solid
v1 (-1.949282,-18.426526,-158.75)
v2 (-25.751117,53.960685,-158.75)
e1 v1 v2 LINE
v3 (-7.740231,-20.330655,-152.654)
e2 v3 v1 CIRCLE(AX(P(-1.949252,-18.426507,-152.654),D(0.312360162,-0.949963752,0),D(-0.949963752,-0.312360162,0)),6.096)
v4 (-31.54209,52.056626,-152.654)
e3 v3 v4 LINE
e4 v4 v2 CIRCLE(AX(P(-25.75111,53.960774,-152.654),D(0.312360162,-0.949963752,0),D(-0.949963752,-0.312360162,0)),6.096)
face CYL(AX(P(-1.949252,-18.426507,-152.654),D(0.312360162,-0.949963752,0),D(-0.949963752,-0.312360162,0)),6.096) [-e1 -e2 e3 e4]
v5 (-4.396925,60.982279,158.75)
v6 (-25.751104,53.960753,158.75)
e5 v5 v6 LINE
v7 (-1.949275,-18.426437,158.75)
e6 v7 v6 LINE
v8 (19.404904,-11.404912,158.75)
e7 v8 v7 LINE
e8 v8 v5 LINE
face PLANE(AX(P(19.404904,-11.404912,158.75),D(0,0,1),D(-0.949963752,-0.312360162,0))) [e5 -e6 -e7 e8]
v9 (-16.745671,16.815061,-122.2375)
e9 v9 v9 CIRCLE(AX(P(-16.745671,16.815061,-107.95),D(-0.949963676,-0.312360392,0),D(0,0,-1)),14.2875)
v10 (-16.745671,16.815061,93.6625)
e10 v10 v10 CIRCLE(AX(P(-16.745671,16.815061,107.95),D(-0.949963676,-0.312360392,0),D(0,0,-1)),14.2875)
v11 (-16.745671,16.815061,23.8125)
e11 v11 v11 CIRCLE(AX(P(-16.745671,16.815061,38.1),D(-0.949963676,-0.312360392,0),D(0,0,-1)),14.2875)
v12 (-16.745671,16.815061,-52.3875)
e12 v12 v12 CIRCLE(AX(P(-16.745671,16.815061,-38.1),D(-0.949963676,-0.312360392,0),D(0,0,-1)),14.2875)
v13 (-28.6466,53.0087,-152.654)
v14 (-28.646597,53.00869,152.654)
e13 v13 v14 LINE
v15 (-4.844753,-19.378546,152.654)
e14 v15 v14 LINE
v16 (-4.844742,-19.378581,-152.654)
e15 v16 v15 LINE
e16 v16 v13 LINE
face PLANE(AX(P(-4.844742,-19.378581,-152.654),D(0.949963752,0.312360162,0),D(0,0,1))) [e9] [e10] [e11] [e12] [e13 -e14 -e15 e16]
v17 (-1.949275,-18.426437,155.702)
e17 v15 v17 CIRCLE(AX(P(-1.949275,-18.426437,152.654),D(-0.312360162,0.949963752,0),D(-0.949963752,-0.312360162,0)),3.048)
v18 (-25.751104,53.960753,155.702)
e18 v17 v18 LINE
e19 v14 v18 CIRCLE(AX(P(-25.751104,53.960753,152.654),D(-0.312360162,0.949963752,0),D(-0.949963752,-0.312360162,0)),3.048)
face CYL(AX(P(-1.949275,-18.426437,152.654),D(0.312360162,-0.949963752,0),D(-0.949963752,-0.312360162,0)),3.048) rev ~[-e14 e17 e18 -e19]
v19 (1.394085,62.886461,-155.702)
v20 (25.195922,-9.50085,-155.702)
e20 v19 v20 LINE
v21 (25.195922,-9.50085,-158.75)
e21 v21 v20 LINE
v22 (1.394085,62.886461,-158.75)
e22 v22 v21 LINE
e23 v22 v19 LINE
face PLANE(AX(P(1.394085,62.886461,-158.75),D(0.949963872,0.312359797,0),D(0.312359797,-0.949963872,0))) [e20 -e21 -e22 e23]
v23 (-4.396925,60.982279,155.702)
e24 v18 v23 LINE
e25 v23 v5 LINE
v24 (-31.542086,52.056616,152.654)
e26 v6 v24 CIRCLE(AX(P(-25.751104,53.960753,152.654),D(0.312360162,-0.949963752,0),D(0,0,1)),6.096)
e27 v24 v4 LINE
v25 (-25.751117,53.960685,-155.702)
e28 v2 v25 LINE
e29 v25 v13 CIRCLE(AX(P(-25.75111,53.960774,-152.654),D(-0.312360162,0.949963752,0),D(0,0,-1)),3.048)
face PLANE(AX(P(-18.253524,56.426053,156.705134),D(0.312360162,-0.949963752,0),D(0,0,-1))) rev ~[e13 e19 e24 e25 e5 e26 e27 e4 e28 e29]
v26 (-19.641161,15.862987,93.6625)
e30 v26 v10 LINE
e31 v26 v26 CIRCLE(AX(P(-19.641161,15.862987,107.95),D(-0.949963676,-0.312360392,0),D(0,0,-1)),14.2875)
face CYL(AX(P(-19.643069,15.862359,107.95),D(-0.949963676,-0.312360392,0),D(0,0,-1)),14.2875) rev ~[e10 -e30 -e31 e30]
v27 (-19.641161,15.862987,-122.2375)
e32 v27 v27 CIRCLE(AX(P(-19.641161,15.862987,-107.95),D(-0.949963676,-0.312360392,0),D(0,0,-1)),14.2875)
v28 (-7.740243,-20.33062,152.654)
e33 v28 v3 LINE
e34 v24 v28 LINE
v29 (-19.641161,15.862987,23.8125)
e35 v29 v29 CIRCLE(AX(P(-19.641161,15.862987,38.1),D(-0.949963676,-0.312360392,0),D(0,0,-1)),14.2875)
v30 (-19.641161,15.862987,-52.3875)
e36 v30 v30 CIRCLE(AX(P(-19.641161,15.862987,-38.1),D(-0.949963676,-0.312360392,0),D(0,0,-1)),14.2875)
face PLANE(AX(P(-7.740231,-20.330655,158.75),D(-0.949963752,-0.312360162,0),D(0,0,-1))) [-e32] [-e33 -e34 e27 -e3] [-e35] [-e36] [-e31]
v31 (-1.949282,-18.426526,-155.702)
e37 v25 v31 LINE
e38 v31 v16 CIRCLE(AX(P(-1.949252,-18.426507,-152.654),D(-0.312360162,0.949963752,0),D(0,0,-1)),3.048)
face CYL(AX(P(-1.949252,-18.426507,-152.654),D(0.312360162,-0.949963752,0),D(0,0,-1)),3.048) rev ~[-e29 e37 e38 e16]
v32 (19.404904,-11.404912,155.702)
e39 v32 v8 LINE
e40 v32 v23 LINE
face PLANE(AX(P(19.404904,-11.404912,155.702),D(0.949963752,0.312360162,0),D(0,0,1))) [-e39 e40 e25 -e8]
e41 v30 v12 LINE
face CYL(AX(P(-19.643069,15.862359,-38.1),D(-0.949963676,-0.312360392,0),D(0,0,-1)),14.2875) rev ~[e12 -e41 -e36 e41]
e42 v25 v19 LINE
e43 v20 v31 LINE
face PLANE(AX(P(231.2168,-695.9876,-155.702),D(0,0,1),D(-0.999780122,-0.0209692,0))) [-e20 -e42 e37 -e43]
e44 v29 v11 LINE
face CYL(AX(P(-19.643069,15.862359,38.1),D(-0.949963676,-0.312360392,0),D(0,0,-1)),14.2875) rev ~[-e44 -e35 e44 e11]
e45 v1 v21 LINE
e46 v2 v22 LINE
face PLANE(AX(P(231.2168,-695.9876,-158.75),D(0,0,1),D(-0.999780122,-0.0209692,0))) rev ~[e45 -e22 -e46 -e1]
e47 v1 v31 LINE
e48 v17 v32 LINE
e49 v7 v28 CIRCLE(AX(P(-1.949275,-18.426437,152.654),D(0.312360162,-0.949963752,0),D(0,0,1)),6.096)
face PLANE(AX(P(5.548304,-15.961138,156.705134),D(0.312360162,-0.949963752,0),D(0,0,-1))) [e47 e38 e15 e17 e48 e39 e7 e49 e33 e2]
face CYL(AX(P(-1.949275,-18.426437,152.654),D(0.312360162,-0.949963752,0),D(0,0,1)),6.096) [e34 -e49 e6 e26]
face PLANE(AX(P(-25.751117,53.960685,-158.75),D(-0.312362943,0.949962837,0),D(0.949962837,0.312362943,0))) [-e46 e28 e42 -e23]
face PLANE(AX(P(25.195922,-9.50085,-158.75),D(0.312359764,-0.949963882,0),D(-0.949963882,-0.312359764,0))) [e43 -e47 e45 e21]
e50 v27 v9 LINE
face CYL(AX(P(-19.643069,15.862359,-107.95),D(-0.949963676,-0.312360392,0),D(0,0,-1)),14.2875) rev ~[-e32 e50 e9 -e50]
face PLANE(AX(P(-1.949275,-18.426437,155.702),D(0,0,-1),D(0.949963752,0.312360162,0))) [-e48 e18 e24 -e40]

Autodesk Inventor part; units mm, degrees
ref_plane "YZ Plane" through (0, 0, 0) normal (1, 0, 0) x (0, 1, 0)
ref_plane "XZ Plane" through (0, 0, 0) normal (0, 1, 0) x (-1, 0, 0)
ref_plane "XY Plane" through (0, 0, 0) normal (0, 0, 1) x (1, 0, 0)
ref_plane "Work Plane1" through (231.2168, -695.9876, -158.75) normal (0, 0, 1) x (-0.9997801, -0.0209692, 0)
sketch "Sketch1" plane through (231.2168, -695.9876, -158.75) normal (0, 0, 1) x (-0.9997801, -0.0209692, 0)
  line L0 (191.5805, -690.6559) -> (218.9069, -682.3014)
  line L1 (218.9069, -682.3014) -> (241.1856, -755.1718)
  line L2 (241.1856, -755.1718) -> (213.8592, -763.5264)
  line L3 (213.8592, -763.5264) -> (191.5805, -690.6559)
  arc A0 (211.507, -928.635) -> (222.8439, -923.2276) centre (216.7713, -925.0841) ccw
  line L4 (203.7328, -860.718) -> (222.8439, -923.2276)
  arc A1 (207.9488, -852.7889) -> (203.7328, -860.718) centre (209.8053, -858.8615) ccw
  line L5 (232.2389, -845.3627) -> (207.9488, -852.7889)
  arc A2 (240.168, -849.5787) -> (232.2389, -845.3627) centre (234.0955, -851.4352) ccw
  line L6 (288.8094, -1008.6774) -> (240.168, -849.5787)
  arc A3 (288.8094, -1008.6774) -> (289.6175, -1010.3717) centre (294.8819, -1006.8208) ccw
  line L7 (308.7826, -1038.7851) -> (289.6175, -1010.3717)
  arc A4 (308.7826, -1038.7851) -> (317.5979, -1040.4986) centre (314.047, -1035.2342) ccw
  line L8 (596.6104, -852.3023) -> (317.5979, -1040.4986)
  line L9 (312.5405, -431.1512) -> (596.6104, -852.3023)
  line L10 (95.3316, -577.6604) -> (312.5405, -431.1512)
  arc A5 (95.3316, -577.6604) -> (92.8099, -584.7814) centre (98.8825, -582.9248) ccw
  line L11 (186.4087, -890.9291) -> (92.8099, -584.7814)
  arc A6 (186.4087, -890.9291) -> (187.2168, -892.6234) centre (192.4812, -889.0725) ccw
  line L12 (211.507, -928.635) -> (187.2168, -892.6234)
  line L13 (151.3976, -689.5372) -> (192.5934, -824.2828)
  arc A7 (155.6135, -681.6081) -> (151.3976, -689.5372) centre (157.4701, -687.6806) ccw
  line L14 (179.9037, -674.1818) -> (155.6135, -681.6081)
  arc A8 (187.8328, -678.3978) -> (179.9037, -674.1818) centre (181.7602, -680.2544) ccw
  line L15 (229.0286, -813.1435) -> (187.8328, -678.3978)
  arc A9 (224.8127, -821.0726) -> (229.0286, -813.1435) centre (222.9561, -815) ccw
  line L16 (200.5225, -828.4988) -> (224.8127, -821.0726)
  arc A10 (192.5934, -824.2828) -> (200.5225, -828.4988) centre (198.666, -822.4263) ccw
  arc A11 (140.2582, -653.102) -> (148.1873, -657.3179) centre (146.3307, -651.2454) ccw
  line L17 (122.5952, -595.3289) -> (140.2582, -653.102)
  arc A12 (125.1168, -588.2079) -> (122.5952, -595.3289) centre (128.6677, -593.4723) ccw
  line L18 (147.1366, -573.3554) -> (125.1168, -588.2079)
  arc A13 (156.76, -576.7633) -> (147.1366, -573.3554) centre (150.6874, -578.6198) ccw
  line L19 (176.6934, -641.9626) -> (156.76, -576.7633)
  arc A14 (172.4774, -649.8917) -> (176.6934, -641.9626) centre (170.6209, -643.8192) ccw
  line L20 (148.1873, -657.3179) -> (172.4774, -649.8917)
  line L21 (440.6793, -731.4527) -> (242.0503, -738.1789)
  arc A15 (235.844, -729.7287) -> (242.0503, -738.1789) centre (241.8354, -731.8326) ccw
  line L22 (235.844, -729.7287) -> (312.2467, -512.1467)
  arc A16 (323.7318, -511.066) -> (312.2467, -512.1467) centre (318.238, -514.2505) ccw
  line L23 (323.7318, -511.066) -> (445.9582, -721.9218)
  arc A17 (440.6793, -731.4527) -> (445.9582, -721.9218) centre (440.4644, -725.1063) ccw
  line L24 (293.699, -488.3023) -> (226.6453, -679.2602)
  arc A18 (214.5814, -679.0129) -> (226.6453, -679.2602) centre (220.6539, -677.1564) ccw
  line L25 (214.5814, -679.0129) -> (177.6445, -558.1977)
  arc A19 (180.1661, -551.0767) -> (177.6445, -558.1977) centre (183.717, -556.3411) ccw
  line L26 (180.1661, -551.0767) -> (284.1568, -480.9341)
  arc A20 (293.699, -488.3023) -> (284.1568, -480.9341) centre (287.7077, -486.1985) ccw
  line L27 (338.9686, -980.6315) -> (474.0479, -788.3553)
  arc A21 (484.7375, -788.821) -> (474.0479, -788.3553) centre (479.2438, -792.0056) ccw
  line L28 (484.7375, -788.821) -> (526.8957, -861.5491)
  arc A22 (524.9528, -869.998) -> (526.8957, -861.5491) centre (521.4019, -864.7336) ccw
  line L29 (524.9528, -869.998) -> (347.7154, -989.5462)
  arc A23 (338.9686, -980.6315) -> (347.7154, -989.5462) centre (344.1645, -984.2818) ccw
  line L30 (303.3396, -969.3278) -> (242.8789, -771.57)
  arc A24 (248.7366, -763.3671) -> (242.8789, -771.57) centre (248.9515, -769.7134) ccw
  line L31 (248.7366, -763.3671) -> (452.9866, -756.4505)
  arc A25 (458.3974, -766.4471) -> (452.9866, -756.4505) centre (453.2015, -762.7968) ccw
  line L32 (458.3974, -766.4471) -> (314.608, -971.1215)
  arc A26 (303.3396, -969.3278) -> (314.608, -971.1215) centre (309.4121, -967.4712) ccw
  line L33 (215.2197, -740.1923) -> (205.7566, -709.24)
  line L34 (210.4881, -724.7162) -> (230.0462, -718.7366) construction
  point P0 (216.5716, -700.683)
  dimension "d0" = 76.2
  dimension "d27" = 28.575
extrude "Plate1" add sketch "Sketch1" along normal blind 3.048 contours L0 A18 L1 L2 L3 | L0 L1 A18
sketch "Sketch2" plane through (-4.8448, -19.3786, -152.654) normal (-0.9499637, -0.3123604, 0) x (0.3123604, -0.9499637, 0)
  line L0 (-76.2, 0) -> (0, 0)
  line L1 (0, 0) -> (0, 311.404)
  line L2 (0, 311.404) -> (-76.2, 311.404)
  line L3 (-76.2, 311.404) -> (-76.2, 0)
edge flange "Flange1" height 317.5 angle 90 thickness 3.048 bend radius 3.048 thickness toward (-0.9499637, -0.3123604, 0) relief tear relief width 3.048 relief depth 1.524 edges at (-13.8502, 17.7671, -155.702) wall of the first edge with corners at (-28.6466, 53.0087, -152.654) (-4.8448, -19.3786, -152.654) (-4.8448, -19.3786, 158.75) (-28.6466, 53.0087, 158.75)
bend "Bend1"
corner "Corner1"
sketch "Sketch3" plane through (-7.7403, -20.3306, 155.702) normal (0, 0, 1) x (1, 0, 0)
  line L0 (-23.8019, 72.3872) -> (0, 0)
  line L1 (0, 0) -> (27.1452, 8.9257)
  line L2 (27.1452, 8.9257) -> (3.3434, 81.3129)
  line L3 (3.3434, 81.3129) -> (-23.8019, 72.3872)
edge flange "Flange2" height 28.575 angle 90 thickness 3.048 bend radius 3.048 thickness toward (0, 0, 1) relief tear relief width 3.048 relief depth 1.524 edges at (-16.7457, 16.815, 158.75) wall of the first edge with corners at (-31.5421, 52.0566, 155.702) (-7.7403, -20.3306, 155.702) (19.4049, -11.4049, 155.702) (-4.3969, 60.9823, 155.702)
bend "Bend2"
corner "Corner2"
sketch "Sketch4" plane through (-31.5421, 52.0566, 152.654) normal (-0.9499637, -0.3123604, 0) x (0, 0, -1)
  line L0 (-6.096, 80.617) -> (-6.096, -4.417)
  line L1 (-6.096, 38.1) -> (311.404, 38.1) construction
  line L2 (311.404, 74.4136) -> (311.404, 1.7864)
  circle A0 centre (44.704, 38.1) radius 31.75
  circle A1 centre (114.554, 38.1) radius 38.1
  circle A2 centre (190.754, 38.1) radius 38.1
  circle A3 centre (260.604, 38.1) radius 31.75
  circle A4 centre (44.704, 38.1) radius 16.2087 construction
  circle A5 centre (260.604, 38.1) radius 16.2087 construction
  circle A6 centre (44.704, 38.1) radius 14.2875
  circle A7 centre (114.554, 38.1) radius 14.2875
  circle A8 centre (190.754, 38.1) radius 14.2875
  circle A9 centre (260.604, 38.1) radius 14.2875
  line L3 (-6.096, 0) -> (-6.096, 76.2) projected
  line L4 (311.404, 0) -> (311.404, 76.2) projected
  line L5 (44.704, 38.1) -> (-6.096, 38.1) construction
  line L6 (260.604, 38.1) -> (311.404, 38.1) construction
  dimension "d22" = 28.575
  dimension "d23" = 63.5
  dimension "d28" = 76.2
extrude "Cut1" cut sketch "Sketch4" against normal blind 3.048 contours A6 | A7 | A8 | A9
equation "\"d25\" = Thickness"
equation "\"d1\" = Thickness"
equation "\"d2\" = BendReliefWidth"
equation "\"d3\" = BendReliefDepth"
equation "\"d4\" = MinimumRemnant"
equation "\"d5\" = TransitionRadius"
equation "\"d8\" = BendRadius"
equation "\"d9\" = CornerReliefSize"
equation "\"d10\" = GapSize"
equation "\"d11\" = JacobiRadiusSize"
equation "\"d12\" = BendReliefWidth"
equation "\"d13\" = BendReliefDepth"
equation "\"d14\" = MinimumRemnant"
equation "\"d15\" = TransitionRadius"
equation "\"d18\" = BendRadius"
equation "\"d19\" = CornerReliefSize"
equation "\"d20\" = GapSize"
equation "\"d21\" = JacobiRadiusSize"
equation "\"BendRadius\" = Thickness"
equation "\"BendReliefWidth\" = Thickness"
equation "\"BendReliefDepth\" = 0.5 * Thickness"
equation "\"CornerReliefSize\" = 4 * Thickness"
equation "\"MinimumRemnant\" = 2 * Thickness"
equation "\"TransitionRadius\" = BendRadius"
equation "\"JacobiRadiusSize\" = BendRadius"
equation "\"GapSize\" = Thickness"
equation "\"Thickness\" = 3.048"
properties part number "GearBracket"
